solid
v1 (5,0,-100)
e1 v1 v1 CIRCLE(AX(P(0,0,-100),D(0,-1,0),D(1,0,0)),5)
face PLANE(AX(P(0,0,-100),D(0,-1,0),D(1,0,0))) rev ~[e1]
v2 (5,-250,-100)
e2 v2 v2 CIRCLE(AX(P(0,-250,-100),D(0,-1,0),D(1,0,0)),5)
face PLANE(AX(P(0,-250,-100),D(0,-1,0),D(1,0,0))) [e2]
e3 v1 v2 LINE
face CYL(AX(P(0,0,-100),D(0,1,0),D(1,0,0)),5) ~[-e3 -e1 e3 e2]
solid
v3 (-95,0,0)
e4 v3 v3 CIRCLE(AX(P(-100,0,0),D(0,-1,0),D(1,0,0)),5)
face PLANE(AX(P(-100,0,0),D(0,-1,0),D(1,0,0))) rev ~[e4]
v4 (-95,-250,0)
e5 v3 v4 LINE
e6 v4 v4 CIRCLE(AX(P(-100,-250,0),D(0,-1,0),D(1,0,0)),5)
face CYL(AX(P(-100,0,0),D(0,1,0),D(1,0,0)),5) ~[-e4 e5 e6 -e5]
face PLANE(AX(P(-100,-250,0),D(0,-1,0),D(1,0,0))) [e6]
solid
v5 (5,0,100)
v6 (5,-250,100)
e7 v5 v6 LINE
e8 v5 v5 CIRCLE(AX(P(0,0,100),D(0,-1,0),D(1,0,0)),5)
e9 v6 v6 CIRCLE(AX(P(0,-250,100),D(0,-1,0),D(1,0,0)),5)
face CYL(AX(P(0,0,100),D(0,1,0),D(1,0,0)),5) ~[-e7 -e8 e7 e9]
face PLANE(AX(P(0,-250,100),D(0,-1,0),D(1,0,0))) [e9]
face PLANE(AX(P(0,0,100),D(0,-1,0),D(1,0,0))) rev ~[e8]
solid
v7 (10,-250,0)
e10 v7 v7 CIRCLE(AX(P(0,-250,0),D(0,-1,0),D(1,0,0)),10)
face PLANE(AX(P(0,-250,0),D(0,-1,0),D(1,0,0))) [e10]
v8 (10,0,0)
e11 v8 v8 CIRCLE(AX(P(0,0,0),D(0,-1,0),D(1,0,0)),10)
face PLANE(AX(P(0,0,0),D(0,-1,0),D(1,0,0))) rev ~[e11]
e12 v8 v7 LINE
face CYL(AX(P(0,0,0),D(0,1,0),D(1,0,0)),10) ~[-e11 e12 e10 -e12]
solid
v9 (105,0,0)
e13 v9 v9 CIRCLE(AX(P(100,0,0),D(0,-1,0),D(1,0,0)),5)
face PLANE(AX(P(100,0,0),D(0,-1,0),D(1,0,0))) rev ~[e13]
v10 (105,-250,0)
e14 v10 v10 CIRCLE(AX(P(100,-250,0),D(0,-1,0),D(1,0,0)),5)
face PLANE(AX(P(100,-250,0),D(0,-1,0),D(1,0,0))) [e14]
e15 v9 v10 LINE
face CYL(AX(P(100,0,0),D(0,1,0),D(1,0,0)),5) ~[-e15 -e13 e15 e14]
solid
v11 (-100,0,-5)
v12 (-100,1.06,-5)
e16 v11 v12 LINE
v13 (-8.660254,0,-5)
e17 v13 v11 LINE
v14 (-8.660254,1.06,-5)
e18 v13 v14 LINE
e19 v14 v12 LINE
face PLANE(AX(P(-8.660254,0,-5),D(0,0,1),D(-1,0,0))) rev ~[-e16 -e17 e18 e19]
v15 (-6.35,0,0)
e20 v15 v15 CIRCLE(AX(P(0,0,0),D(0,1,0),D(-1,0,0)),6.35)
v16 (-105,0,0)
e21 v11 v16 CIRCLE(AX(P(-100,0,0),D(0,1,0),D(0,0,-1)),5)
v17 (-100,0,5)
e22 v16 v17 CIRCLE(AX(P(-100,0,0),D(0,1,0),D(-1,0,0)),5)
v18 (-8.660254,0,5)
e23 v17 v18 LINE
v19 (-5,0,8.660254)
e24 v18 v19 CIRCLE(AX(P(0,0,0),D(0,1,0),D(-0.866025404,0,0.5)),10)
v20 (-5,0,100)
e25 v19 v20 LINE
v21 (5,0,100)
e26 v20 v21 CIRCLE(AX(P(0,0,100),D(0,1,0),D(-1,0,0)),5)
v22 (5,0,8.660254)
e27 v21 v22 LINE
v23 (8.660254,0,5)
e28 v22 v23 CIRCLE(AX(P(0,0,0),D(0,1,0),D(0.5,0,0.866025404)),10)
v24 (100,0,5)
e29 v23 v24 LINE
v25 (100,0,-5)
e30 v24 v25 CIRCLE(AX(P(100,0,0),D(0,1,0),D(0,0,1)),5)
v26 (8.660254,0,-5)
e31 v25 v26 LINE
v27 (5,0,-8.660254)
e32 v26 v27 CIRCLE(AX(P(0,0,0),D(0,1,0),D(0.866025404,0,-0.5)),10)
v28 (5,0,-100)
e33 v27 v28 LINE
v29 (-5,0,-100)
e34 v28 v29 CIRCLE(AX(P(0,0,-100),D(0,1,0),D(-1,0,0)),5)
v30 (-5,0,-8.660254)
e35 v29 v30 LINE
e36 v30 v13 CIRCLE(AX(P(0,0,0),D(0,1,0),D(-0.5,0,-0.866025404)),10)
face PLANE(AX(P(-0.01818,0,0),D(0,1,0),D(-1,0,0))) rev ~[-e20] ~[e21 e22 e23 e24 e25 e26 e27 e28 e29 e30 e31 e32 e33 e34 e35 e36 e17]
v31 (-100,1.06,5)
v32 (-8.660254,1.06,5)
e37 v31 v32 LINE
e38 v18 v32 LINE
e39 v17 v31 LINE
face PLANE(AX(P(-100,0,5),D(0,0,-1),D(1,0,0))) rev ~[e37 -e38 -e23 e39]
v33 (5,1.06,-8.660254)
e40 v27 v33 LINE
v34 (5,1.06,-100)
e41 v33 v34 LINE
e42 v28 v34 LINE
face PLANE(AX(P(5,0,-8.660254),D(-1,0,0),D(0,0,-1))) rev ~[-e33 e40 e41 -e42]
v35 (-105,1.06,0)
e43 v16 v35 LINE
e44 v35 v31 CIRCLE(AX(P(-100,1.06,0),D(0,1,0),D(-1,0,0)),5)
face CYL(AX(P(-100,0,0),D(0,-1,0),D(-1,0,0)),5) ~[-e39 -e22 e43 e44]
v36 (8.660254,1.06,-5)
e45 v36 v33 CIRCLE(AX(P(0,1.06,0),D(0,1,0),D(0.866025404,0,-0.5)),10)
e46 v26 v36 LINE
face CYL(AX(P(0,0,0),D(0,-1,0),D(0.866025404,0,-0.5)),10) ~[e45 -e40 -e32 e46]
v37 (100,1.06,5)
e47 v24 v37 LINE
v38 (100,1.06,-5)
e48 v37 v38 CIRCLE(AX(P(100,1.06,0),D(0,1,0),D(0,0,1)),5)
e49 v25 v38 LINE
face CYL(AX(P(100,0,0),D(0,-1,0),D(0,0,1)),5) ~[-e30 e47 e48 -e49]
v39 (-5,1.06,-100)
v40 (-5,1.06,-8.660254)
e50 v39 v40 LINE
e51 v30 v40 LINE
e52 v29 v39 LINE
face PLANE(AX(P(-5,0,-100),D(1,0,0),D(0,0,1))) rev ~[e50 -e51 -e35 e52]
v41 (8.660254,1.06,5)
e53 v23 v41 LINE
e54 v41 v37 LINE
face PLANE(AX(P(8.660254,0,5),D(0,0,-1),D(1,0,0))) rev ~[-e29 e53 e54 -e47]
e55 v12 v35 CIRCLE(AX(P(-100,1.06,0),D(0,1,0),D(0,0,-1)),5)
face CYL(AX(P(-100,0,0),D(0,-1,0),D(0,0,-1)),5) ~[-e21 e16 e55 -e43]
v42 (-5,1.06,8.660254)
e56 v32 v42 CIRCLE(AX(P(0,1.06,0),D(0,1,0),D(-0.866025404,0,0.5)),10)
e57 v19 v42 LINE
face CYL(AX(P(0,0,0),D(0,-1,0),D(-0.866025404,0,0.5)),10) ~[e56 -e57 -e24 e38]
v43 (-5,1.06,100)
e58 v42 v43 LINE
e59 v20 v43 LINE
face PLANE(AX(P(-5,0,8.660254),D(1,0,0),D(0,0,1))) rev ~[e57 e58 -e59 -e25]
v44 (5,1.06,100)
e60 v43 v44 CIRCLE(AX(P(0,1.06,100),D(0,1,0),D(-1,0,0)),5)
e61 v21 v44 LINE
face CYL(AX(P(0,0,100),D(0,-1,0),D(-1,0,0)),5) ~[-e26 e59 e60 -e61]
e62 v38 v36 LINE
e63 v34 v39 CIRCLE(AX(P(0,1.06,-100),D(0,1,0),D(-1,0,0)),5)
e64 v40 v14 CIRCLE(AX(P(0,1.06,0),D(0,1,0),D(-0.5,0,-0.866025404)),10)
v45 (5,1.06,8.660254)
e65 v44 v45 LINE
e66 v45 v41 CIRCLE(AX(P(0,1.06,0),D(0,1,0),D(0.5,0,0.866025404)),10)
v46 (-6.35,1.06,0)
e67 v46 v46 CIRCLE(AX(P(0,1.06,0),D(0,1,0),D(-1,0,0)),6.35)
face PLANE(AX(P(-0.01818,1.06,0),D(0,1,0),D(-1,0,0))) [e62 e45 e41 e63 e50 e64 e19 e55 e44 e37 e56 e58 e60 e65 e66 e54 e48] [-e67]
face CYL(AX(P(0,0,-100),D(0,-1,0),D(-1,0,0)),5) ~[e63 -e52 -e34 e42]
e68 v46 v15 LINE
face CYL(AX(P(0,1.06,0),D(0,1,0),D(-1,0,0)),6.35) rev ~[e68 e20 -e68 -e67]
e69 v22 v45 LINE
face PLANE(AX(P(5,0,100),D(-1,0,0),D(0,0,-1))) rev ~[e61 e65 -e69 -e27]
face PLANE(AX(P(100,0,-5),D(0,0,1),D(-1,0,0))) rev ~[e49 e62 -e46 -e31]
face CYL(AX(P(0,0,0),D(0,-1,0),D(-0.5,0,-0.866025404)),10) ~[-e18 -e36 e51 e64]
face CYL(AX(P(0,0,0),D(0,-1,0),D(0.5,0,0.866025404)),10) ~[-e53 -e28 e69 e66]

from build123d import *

# Parameters (mm, degrees)
F0_R     = 10
F1_DEPTH = 250
F0_R_2   = 5
F3_DEPTH = 1.06
F4_R     = 6.35
F5_DEPTH = 50


with BuildPart() as f1:
    # F0 (on Front) → F1 (new body)
    with BuildSketch(Plane.XZ):
        Circle(F0_R)
    extrude(amount=F1_DEPTH)


with BuildPart() as f1b:
    # F0 (on Front) → F1, piece 2 (new body)
    with BuildSketch(Plane.XZ):
        with Locations((-100, 0)):
            Circle(F0_R_2)
    extrude(amount=F1_DEPTH)


with BuildPart() as f1c:
    # F0 (on Front) → F1, piece 3 (new body)
    with BuildSketch(Plane.XZ):
        with Locations((0, -100)):
            Circle(F0_R_2)
    extrude(amount=F1_DEPTH)


with BuildPart() as f1d:
    # F0 (on Front) → F1, piece 4 (new body)
    with BuildSketch(Plane.XZ):
        with Locations((100, 0)):
            Circle(F0_R_2)
    extrude(amount=F1_DEPTH)


with BuildPart() as f1e:
    # F0 (on Front) → F1, piece 5 (new body)
    with BuildSketch(Plane.XZ):
        with Locations((0, 100)):
            Circle(F0_R_2)
    extrude(amount=F1_DEPTH)


with BuildPart() as f3:
    # F2 (on face) → F3 (new body)
    with BuildSketch(Plane(origin=(0, 0, 0), x_dir=(-1, 0, 0), z_dir=(0, 1, 0))):
        with BuildLine():
            ThreePointArc((8.6602540378, -5), (9.6592582629, -2.588190451), (10, 0))
            ThreePointArc((10, 0), (9.6592582629, 2.588190451), (8.6602540378, 5))
            ThreePointArc((8.6602540378, 5), (7.0710678119, 7.0710678119), (5, 8.6602540378))
            ThreePointArc((5, 8.6602540378), (0, 10), (-5, 8.6602540378))
            ThreePointArc((-5, 8.6602540378), (-7.0710678119, 7.0710678119), (-8.6602540378, 5))
            ThreePointArc((-8.6602540378, 5), (-10, 0), (-8.6602540378, -5))
            ThreePointArc((-8.6602540378, -5), (-7.0710678119, -7.0710678119), (-5, -8.6602540378))
            ThreePointArc((-5, -8.6602540378), (0, -10), (5, -8.6602540378))
            ThreePointArc((5, -8.6602540378), (7.0710678119, -7.0710678119), (8.6602540378, -5))
        make_face()
        with BuildLine():
            ThreePointArc((8.6602540378, 5), (9.6592582629, 2.588190451), (10, 0))
            ThreePointArc((10, 0), (9.6592582629, -2.588190451), (8.6602540378, -5))
            Line((8.6602540378, -5), (100, -5))
            ThreePointArc((100, -5), (95, 0), (100, 5))
            Line((100, 5), (8.6602540378, 5))
        make_face()
        with BuildLine():
            ThreePointArc((-5, 8.6602540378), (0, 10), (5, 8.6602540378))
            Line((5, 8.6602540378), (5, 100))
            ThreePointArc((5, 100), (0, 95), (-5, 100))
            Line((-5, 100), (-5, 8.6602540378))
        make_face()
        with BuildLine():
            ThreePointArc((105, 0), (103.5355339059, 3.5355339059), (100, 5))
            ThreePointArc((100, 5), (95, 0), (100, -5))
            ThreePointArc((100, -5), (103.5355339059, -3.5355339059), (105, 0))
        make_face()
        with BuildLine():
            Line((5, -100), (5, -8.6602540378))
            ThreePointArc((5, -8.6602540378), (0, -10), (-5, -8.6602540378))
            Line((-5, -8.6602540378), (-5, -100))
            ThreePointArc((-5, -100), (0, -95), (5, -100))
        make_face()
        with BuildLine():
            ThreePointArc((-5, 100), (0, 95), (5, 100))
            ThreePointArc((5, 100), (0, 105), (-5, 100))
        make_face()
        with BuildLine():
            ThreePointArc((-5, -100), (0, -105), (5, -100))
            ThreePointArc((5, -100), (0, -95), (-5, -100))
        make_face()
        with BuildLine():
            ThreePointArc((-8.6602540378, -5), (-10, 0), (-8.6602540378, 5))
            Line((-8.6602540378, 5), (-100, 5))
            ThreePointArc((-100, 5), (-96.4644660941, 3.5355339059), (-95, 0))
            ThreePointArc((-95, 0), (-96.4644660941, -3.5355339059), (-100, -5))
            Line((-100, -5), (-8.6602540378, -5))
        make_face()
        with BuildLine():
            ThreePointArc((-95, 0), (-96.4644660941, 3.5355339059), (-100, 5))
            ThreePointArc((-100, 5), (-105, 0), (-100, -5))
            ThreePointArc((-100, -5), (-96.4644660941, -3.5355339059), (-95, 0))
        make_face()
    extrude(amount=F3_DEPTH)

    # F4 (on face) → F5 (cut)
    with BuildSketch(Plane(origin=(0, 1.06, 0), x_dir=(-1, 0, 0), z_dir=(0, 1, 0))):
        Circle(F4_R)
    extrude(amount=-F5_DEPTH, mode=Mode.SUBTRACT)


solid = Compound([f1.part, f1b.part, f1c.part, f1d.part, f1e.part, f3.part])
